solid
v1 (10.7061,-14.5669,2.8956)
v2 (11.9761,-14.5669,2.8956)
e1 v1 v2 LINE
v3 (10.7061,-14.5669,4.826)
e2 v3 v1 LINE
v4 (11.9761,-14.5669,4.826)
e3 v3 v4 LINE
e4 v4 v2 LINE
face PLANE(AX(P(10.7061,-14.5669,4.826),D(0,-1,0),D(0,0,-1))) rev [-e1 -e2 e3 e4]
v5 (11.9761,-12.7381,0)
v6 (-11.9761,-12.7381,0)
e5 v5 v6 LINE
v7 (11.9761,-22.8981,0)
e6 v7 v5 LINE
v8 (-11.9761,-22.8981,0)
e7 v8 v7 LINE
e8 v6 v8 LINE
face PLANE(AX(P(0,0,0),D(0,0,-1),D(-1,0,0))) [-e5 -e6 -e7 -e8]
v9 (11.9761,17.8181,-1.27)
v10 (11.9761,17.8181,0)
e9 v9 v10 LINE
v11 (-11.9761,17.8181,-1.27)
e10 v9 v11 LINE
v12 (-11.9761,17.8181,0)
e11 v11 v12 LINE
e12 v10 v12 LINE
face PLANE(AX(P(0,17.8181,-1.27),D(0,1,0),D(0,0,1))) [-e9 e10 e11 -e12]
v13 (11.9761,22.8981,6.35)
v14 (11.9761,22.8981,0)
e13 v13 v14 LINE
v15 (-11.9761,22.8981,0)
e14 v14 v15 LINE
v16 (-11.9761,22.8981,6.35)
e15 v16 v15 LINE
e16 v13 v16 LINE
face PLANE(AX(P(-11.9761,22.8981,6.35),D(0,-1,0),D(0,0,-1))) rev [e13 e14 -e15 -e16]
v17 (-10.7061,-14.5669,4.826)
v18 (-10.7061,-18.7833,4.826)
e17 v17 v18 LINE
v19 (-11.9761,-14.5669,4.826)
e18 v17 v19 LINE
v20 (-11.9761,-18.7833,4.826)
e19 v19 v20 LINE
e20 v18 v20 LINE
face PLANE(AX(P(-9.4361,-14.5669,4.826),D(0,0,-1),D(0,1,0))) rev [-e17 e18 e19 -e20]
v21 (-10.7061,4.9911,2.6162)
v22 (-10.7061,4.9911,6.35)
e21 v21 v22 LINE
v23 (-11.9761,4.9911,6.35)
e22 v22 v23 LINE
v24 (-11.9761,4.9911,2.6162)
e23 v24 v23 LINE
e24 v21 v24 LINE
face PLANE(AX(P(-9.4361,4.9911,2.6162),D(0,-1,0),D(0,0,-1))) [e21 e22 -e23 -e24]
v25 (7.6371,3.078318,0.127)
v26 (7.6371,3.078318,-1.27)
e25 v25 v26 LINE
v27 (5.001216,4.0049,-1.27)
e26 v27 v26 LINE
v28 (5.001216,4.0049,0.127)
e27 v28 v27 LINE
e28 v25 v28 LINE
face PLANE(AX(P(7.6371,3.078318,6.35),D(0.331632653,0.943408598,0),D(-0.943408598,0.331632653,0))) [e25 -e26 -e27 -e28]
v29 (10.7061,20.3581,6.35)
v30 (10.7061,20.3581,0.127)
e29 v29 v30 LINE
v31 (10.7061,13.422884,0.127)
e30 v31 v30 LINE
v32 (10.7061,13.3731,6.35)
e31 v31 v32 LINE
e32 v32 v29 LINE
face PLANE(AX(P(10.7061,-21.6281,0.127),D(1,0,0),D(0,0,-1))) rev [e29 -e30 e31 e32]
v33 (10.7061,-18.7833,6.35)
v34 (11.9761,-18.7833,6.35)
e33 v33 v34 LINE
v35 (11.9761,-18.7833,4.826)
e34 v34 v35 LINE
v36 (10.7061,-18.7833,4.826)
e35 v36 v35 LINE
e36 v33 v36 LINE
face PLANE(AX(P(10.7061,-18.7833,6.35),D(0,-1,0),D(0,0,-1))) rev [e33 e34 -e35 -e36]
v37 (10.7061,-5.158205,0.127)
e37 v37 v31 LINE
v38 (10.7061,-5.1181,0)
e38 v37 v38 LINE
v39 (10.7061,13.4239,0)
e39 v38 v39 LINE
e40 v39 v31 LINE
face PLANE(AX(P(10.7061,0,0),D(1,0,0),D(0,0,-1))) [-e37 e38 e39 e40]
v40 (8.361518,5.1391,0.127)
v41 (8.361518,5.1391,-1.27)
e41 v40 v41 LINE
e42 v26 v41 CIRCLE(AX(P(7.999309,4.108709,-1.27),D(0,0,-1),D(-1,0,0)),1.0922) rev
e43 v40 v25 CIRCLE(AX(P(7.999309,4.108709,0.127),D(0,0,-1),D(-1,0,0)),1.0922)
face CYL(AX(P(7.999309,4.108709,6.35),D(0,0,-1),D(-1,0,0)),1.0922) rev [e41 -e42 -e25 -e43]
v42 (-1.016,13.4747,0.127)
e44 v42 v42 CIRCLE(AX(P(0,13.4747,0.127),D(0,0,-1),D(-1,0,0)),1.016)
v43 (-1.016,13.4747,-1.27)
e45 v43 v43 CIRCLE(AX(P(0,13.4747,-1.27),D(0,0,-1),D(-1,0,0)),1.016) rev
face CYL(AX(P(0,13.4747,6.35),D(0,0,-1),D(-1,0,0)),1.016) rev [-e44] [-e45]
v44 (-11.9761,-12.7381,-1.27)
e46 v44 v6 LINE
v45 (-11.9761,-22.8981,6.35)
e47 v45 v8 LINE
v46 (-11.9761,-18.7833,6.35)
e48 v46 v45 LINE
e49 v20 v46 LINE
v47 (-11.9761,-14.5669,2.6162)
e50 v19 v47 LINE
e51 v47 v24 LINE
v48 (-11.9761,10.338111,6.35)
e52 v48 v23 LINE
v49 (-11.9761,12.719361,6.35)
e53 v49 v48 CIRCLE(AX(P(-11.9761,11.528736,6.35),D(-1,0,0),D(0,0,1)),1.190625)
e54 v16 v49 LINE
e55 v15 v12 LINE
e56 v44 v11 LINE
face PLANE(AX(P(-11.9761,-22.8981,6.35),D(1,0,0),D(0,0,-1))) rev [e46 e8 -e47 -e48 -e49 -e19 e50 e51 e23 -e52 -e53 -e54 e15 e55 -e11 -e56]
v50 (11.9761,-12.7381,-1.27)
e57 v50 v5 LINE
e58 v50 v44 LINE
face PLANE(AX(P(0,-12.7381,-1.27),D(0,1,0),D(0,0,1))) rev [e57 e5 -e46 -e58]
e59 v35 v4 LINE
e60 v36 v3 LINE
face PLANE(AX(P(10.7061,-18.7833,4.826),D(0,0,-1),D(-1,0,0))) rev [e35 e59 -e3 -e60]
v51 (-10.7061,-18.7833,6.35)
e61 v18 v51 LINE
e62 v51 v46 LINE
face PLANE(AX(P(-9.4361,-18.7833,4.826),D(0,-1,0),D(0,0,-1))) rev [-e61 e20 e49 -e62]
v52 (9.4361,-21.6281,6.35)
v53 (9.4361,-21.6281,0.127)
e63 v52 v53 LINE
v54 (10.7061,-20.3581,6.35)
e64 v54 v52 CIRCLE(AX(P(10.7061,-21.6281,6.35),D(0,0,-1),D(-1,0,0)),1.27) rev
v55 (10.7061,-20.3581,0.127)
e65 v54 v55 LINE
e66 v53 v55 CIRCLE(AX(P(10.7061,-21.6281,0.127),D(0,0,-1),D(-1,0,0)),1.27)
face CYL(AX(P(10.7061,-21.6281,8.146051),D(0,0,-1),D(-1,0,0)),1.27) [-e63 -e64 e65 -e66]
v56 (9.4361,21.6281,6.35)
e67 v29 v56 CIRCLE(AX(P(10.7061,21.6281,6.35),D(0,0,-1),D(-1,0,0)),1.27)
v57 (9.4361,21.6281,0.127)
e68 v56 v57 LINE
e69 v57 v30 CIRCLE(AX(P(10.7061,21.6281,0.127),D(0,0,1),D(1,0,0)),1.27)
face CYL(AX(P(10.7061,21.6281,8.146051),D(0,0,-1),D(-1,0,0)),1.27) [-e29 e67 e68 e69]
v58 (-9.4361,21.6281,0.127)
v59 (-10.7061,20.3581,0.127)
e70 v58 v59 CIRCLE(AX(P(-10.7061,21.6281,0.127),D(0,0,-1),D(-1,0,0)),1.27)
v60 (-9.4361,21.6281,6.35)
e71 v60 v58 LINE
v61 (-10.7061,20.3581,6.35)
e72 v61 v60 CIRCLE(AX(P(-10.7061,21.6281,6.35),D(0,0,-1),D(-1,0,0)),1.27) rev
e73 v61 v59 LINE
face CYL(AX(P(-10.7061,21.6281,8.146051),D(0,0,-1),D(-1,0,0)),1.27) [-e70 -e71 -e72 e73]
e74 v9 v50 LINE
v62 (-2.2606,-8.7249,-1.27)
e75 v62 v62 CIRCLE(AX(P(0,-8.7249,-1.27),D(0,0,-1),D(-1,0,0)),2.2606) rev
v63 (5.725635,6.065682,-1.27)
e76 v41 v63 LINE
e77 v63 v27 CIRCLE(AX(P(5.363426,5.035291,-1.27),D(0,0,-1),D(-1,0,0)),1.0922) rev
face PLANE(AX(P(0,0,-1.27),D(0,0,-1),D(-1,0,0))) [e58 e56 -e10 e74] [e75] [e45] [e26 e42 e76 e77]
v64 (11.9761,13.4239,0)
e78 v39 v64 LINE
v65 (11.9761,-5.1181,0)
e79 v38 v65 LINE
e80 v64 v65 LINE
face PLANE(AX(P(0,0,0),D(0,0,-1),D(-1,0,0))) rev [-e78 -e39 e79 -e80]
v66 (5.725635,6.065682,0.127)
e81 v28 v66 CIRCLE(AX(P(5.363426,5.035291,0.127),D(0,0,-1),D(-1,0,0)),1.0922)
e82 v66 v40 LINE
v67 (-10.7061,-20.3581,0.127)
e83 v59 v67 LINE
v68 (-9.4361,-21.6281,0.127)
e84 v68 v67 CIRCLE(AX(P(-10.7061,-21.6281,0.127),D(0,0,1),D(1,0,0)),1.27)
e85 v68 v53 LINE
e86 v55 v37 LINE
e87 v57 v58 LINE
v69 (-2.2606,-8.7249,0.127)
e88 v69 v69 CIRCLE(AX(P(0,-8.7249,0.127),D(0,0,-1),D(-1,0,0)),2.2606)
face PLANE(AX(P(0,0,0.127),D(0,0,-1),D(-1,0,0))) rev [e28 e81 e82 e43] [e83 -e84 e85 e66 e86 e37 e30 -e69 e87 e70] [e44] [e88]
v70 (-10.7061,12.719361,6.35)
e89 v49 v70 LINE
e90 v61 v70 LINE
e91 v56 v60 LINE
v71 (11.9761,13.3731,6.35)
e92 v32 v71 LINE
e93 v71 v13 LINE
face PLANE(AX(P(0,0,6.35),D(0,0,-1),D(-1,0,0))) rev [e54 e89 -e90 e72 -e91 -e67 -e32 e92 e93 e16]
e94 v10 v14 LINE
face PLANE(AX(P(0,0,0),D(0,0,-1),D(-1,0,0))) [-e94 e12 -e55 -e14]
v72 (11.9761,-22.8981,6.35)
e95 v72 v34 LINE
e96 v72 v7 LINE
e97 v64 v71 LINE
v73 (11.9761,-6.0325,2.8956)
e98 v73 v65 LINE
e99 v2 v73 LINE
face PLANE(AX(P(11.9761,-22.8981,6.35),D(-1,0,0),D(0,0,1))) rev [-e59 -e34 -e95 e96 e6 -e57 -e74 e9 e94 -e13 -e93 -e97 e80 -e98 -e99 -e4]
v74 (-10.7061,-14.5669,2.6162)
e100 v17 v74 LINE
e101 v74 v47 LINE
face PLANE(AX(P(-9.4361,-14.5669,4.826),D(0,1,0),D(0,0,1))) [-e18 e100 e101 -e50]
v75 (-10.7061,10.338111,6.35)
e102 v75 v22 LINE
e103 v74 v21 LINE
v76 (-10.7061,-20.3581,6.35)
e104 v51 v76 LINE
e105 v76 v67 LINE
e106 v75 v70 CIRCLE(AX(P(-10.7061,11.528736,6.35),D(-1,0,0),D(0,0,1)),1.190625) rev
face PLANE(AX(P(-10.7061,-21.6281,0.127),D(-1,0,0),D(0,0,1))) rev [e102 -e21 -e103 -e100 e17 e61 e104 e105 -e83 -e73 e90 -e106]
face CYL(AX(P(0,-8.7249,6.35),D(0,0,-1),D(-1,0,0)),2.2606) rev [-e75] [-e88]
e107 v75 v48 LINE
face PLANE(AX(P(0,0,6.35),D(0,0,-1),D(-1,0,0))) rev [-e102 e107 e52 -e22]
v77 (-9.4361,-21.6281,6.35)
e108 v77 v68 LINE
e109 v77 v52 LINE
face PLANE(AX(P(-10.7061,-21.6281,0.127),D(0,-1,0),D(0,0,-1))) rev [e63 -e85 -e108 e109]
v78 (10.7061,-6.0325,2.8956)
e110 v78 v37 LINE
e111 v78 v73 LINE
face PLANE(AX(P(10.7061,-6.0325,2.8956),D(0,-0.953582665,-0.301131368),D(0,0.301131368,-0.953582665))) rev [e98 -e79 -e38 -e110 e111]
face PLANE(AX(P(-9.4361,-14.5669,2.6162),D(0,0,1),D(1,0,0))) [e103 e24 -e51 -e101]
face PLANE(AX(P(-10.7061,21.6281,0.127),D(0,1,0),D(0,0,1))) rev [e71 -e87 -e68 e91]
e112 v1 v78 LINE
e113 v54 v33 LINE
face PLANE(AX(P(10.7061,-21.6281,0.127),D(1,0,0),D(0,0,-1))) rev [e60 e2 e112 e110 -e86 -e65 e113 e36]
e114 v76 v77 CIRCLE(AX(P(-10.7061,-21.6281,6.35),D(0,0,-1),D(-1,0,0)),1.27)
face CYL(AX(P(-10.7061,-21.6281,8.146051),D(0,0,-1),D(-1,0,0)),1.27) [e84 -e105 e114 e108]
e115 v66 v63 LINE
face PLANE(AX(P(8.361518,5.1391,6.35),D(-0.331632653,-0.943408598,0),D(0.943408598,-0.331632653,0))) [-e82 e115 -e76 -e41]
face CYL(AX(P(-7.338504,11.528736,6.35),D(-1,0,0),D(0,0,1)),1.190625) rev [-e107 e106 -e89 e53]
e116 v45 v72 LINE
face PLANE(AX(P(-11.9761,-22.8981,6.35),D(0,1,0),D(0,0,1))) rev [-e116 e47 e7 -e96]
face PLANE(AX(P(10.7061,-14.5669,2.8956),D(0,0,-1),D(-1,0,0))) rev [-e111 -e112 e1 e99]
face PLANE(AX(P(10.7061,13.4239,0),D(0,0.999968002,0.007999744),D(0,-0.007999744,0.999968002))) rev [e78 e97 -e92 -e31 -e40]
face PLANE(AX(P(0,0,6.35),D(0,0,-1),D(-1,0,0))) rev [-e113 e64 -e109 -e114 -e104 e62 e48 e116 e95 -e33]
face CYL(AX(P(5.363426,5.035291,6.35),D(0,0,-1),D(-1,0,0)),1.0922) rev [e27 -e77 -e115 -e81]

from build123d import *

# Parameters (mm, degrees)
SKETCH2_W                  = 23.9522
SKETCH2_H                  = 45.7962
SKETCH2_R                  = 2.2606
SKETCH2_R_2                = 1.016
BOSS_EXTRUDE1_DEPTH        = 6.35
SKETCH4_W                  = 21.4122
SKETCH4_H                  = 43.2562
CUT_EXTRUDE1_DEPTH         = 6.223
CUT_EXTRUDE3_DEPTH         = 2.54
CUT_EXTRUDE5_DEPTH         = 1.27
BOSS_EXTRUDE3_DEPTH        = 6.223
BOSS_EXTRUDE15_OUTLINE_W   = 23.9522
BOSS_EXTRUDE15_OUTLINE_H   = 30.5562
BOSS_EXTRUDE15_OUTLINE_R   = 2.2606
BOSS_EXTRUDE15_OUTLINE_R_2 = 1.016
BOSS_EXTRUDE15_DEPTH       = 1.27
SKETCH14_R                 = 1.190625
CUT_EXTRUDE6_DEPTH         = 1.27


# Read off the part's stored shape, not the designer's step: Boss-Extrude15
with BuildPart() as part:
    # Sketch2 → Boss-Extrude1 (new body)
    with BuildSketch(Plane.XY):
        Rectangle(SKETCH2_W, SKETCH2_H)
        with Locations((0, -8.7249)):
            Circle(SKETCH2_R, mode=Mode.SUBTRACT)
        with Locations((0, 13.4747)):
            Circle(SKETCH2_R_2, mode=Mode.SUBTRACT)
        with BuildLine():
            Line((8.361518313, 5.139100055), (5.725634689, 6.065681687))
            ThreePointArc((5.725634689, 6.065681687), (4.333034634, 5.3975), (5.001216321, 4.004899945))
            Line((5.001216321, 4.004899945), (7.637099945, 3.078318313))
            ThreePointArc((7.637099945, 3.078318313), (9.0297, 3.7465), (8.361518313, 5.139100055))
        make_face(mode=Mode.SUBTRACT)
    extrude(amount=BOSS_EXTRUDE1_DEPTH)

    # Sketch4 → Cut-Extrude1 (cut)
    with BuildSketch(Plane.XY.offset(6.35)):
        Rectangle(SKETCH4_W, SKETCH4_H)
    extrude(amount=-CUT_EXTRUDE1_DEPTH, mode=Mode.SUBTRACT)

    # Sketch6 → Cut-Extrude3 (cut)
    with BuildSketch(Plane.ZY.offset(11.9761)):
        Polygon((4.826, -14.5669), (2.6162, -14.5669), (2.6162, 4.9911), (6.35, 4.9911), (6.35, -18.7833), (4.826, -18.7833), align=None)
    extrude(amount=-CUT_EXTRUDE3_DEPTH, mode=Mode.SUBTRACT)

    # Sketch8 → Cut-Extrude5 (cut)
    with BuildSketch(Plane(origin=(11.9761, 0, 0), x_dir=(0, 0, -1), z_dir=(1, 0, 0))):
        Polygon((-6.35, -18.7833), (-4.826, -18.7833), (-4.826, -14.5669), (-2.8956, -14.5669), (-2.8956, -6.0325), (0, -5.1181), (0, 13.4239), (-6.35, 13.3731), align=None)
    extrude(amount=-CUT_EXTRUDE5_DEPTH, mode=Mode.SUBTRACT)

    # Sketch10 → Boss-Extrude3 (add)
    with BuildSketch(Plane.XY.offset(0.127)):
        with BuildLine():
            ThreePointArc((-10.7061, 20.3581), (-9.808074388, 20.730074388), (-9.4361, 21.6281))
            Line((-9.4361, 21.6281), (-10.7061, 21.6281))
            Line((-10.7061, 21.6281), (-10.7061, 20.3581))
        make_face()
        with BuildLine():
            ThreePointArc((9.4361, 21.6281), (9.808074388, 20.730074388), (10.7061, 20.3581))
            Line((10.7061, 20.3581), (10.7061, 21.6281))
            Line((10.7061, 21.6281), (9.4361, 21.6281))
        make_face()
        with BuildLine():
            ThreePointArc((-9.4361, -21.6281), (-9.808074388, -20.730074388), (-10.7061, -20.3581))
            Line((-10.7061, -20.3581), (-10.7061, -21.6281))
            Line((-10.7061, -21.6281), (-9.4361, -21.6281))
        make_face()
        with BuildLine():
            Line((10.7061, -21.6281), (10.7061, -20.3581))
            ThreePointArc((10.7061, -20.3581), (9.808074388, -20.730074388), (9.4361, -21.6281))
            Line((9.4361, -21.6281), (10.7061, -21.6281))
        make_face()
    extrude(amount=BOSS_EXTRUDE3_DEPTH)

    # Boss-Extrude15 outline → Boss-Extrude15 (add)
    with BuildSketch(Plane(origin=(0, 0, 0), x_dir=(-1, 0, 0), z_dir=(0, 0, -1))):
        with Locations((0, 2.54)):
            Rectangle(BOSS_EXTRUDE15_OUTLINE_W, BOSS_EXTRUDE15_OUTLINE_H)
        with Locations((0, -8.7249)):
            Circle(BOSS_EXTRUDE15_OUTLINE_R, mode=Mode.SUBTRACT)
        with BuildLine():
            ThreePointArc((-7.637099945, 3.078318313), (-9.0297, 3.7465), (-8.361518313, 5.139100055))
            Line((-8.361518313, 5.139100055), (-5.725634689, 6.065681687))
            ThreePointArc((-5.725634689, 6.065681687), (-4.333034634, 5.3975), (-5.001216321, 4.004899945))
            Line((-5.001216321, 4.004899945), (-7.637099945, 3.078318313))
        make_face(mode=Mode.SUBTRACT)
        with Locations((0, 13.4747)):
            Circle(BOSS_EXTRUDE15_OUTLINE_R_2, mode=Mode.SUBTRACT)
    extrude(amount=BOSS_EXTRUDE15_DEPTH)

    # Sketch14 → Cut-Extrude6 (cut)
    with BuildSketch(Plane.ZY.offset(11.9761)):
        with Locations((6.35, 11.528736377)):
            Circle(SKETCH14_R)
    extrude(amount=-CUT_EXTRUDE6_DEPTH, mode=Mode.SUBTRACT)


solid = part.part
